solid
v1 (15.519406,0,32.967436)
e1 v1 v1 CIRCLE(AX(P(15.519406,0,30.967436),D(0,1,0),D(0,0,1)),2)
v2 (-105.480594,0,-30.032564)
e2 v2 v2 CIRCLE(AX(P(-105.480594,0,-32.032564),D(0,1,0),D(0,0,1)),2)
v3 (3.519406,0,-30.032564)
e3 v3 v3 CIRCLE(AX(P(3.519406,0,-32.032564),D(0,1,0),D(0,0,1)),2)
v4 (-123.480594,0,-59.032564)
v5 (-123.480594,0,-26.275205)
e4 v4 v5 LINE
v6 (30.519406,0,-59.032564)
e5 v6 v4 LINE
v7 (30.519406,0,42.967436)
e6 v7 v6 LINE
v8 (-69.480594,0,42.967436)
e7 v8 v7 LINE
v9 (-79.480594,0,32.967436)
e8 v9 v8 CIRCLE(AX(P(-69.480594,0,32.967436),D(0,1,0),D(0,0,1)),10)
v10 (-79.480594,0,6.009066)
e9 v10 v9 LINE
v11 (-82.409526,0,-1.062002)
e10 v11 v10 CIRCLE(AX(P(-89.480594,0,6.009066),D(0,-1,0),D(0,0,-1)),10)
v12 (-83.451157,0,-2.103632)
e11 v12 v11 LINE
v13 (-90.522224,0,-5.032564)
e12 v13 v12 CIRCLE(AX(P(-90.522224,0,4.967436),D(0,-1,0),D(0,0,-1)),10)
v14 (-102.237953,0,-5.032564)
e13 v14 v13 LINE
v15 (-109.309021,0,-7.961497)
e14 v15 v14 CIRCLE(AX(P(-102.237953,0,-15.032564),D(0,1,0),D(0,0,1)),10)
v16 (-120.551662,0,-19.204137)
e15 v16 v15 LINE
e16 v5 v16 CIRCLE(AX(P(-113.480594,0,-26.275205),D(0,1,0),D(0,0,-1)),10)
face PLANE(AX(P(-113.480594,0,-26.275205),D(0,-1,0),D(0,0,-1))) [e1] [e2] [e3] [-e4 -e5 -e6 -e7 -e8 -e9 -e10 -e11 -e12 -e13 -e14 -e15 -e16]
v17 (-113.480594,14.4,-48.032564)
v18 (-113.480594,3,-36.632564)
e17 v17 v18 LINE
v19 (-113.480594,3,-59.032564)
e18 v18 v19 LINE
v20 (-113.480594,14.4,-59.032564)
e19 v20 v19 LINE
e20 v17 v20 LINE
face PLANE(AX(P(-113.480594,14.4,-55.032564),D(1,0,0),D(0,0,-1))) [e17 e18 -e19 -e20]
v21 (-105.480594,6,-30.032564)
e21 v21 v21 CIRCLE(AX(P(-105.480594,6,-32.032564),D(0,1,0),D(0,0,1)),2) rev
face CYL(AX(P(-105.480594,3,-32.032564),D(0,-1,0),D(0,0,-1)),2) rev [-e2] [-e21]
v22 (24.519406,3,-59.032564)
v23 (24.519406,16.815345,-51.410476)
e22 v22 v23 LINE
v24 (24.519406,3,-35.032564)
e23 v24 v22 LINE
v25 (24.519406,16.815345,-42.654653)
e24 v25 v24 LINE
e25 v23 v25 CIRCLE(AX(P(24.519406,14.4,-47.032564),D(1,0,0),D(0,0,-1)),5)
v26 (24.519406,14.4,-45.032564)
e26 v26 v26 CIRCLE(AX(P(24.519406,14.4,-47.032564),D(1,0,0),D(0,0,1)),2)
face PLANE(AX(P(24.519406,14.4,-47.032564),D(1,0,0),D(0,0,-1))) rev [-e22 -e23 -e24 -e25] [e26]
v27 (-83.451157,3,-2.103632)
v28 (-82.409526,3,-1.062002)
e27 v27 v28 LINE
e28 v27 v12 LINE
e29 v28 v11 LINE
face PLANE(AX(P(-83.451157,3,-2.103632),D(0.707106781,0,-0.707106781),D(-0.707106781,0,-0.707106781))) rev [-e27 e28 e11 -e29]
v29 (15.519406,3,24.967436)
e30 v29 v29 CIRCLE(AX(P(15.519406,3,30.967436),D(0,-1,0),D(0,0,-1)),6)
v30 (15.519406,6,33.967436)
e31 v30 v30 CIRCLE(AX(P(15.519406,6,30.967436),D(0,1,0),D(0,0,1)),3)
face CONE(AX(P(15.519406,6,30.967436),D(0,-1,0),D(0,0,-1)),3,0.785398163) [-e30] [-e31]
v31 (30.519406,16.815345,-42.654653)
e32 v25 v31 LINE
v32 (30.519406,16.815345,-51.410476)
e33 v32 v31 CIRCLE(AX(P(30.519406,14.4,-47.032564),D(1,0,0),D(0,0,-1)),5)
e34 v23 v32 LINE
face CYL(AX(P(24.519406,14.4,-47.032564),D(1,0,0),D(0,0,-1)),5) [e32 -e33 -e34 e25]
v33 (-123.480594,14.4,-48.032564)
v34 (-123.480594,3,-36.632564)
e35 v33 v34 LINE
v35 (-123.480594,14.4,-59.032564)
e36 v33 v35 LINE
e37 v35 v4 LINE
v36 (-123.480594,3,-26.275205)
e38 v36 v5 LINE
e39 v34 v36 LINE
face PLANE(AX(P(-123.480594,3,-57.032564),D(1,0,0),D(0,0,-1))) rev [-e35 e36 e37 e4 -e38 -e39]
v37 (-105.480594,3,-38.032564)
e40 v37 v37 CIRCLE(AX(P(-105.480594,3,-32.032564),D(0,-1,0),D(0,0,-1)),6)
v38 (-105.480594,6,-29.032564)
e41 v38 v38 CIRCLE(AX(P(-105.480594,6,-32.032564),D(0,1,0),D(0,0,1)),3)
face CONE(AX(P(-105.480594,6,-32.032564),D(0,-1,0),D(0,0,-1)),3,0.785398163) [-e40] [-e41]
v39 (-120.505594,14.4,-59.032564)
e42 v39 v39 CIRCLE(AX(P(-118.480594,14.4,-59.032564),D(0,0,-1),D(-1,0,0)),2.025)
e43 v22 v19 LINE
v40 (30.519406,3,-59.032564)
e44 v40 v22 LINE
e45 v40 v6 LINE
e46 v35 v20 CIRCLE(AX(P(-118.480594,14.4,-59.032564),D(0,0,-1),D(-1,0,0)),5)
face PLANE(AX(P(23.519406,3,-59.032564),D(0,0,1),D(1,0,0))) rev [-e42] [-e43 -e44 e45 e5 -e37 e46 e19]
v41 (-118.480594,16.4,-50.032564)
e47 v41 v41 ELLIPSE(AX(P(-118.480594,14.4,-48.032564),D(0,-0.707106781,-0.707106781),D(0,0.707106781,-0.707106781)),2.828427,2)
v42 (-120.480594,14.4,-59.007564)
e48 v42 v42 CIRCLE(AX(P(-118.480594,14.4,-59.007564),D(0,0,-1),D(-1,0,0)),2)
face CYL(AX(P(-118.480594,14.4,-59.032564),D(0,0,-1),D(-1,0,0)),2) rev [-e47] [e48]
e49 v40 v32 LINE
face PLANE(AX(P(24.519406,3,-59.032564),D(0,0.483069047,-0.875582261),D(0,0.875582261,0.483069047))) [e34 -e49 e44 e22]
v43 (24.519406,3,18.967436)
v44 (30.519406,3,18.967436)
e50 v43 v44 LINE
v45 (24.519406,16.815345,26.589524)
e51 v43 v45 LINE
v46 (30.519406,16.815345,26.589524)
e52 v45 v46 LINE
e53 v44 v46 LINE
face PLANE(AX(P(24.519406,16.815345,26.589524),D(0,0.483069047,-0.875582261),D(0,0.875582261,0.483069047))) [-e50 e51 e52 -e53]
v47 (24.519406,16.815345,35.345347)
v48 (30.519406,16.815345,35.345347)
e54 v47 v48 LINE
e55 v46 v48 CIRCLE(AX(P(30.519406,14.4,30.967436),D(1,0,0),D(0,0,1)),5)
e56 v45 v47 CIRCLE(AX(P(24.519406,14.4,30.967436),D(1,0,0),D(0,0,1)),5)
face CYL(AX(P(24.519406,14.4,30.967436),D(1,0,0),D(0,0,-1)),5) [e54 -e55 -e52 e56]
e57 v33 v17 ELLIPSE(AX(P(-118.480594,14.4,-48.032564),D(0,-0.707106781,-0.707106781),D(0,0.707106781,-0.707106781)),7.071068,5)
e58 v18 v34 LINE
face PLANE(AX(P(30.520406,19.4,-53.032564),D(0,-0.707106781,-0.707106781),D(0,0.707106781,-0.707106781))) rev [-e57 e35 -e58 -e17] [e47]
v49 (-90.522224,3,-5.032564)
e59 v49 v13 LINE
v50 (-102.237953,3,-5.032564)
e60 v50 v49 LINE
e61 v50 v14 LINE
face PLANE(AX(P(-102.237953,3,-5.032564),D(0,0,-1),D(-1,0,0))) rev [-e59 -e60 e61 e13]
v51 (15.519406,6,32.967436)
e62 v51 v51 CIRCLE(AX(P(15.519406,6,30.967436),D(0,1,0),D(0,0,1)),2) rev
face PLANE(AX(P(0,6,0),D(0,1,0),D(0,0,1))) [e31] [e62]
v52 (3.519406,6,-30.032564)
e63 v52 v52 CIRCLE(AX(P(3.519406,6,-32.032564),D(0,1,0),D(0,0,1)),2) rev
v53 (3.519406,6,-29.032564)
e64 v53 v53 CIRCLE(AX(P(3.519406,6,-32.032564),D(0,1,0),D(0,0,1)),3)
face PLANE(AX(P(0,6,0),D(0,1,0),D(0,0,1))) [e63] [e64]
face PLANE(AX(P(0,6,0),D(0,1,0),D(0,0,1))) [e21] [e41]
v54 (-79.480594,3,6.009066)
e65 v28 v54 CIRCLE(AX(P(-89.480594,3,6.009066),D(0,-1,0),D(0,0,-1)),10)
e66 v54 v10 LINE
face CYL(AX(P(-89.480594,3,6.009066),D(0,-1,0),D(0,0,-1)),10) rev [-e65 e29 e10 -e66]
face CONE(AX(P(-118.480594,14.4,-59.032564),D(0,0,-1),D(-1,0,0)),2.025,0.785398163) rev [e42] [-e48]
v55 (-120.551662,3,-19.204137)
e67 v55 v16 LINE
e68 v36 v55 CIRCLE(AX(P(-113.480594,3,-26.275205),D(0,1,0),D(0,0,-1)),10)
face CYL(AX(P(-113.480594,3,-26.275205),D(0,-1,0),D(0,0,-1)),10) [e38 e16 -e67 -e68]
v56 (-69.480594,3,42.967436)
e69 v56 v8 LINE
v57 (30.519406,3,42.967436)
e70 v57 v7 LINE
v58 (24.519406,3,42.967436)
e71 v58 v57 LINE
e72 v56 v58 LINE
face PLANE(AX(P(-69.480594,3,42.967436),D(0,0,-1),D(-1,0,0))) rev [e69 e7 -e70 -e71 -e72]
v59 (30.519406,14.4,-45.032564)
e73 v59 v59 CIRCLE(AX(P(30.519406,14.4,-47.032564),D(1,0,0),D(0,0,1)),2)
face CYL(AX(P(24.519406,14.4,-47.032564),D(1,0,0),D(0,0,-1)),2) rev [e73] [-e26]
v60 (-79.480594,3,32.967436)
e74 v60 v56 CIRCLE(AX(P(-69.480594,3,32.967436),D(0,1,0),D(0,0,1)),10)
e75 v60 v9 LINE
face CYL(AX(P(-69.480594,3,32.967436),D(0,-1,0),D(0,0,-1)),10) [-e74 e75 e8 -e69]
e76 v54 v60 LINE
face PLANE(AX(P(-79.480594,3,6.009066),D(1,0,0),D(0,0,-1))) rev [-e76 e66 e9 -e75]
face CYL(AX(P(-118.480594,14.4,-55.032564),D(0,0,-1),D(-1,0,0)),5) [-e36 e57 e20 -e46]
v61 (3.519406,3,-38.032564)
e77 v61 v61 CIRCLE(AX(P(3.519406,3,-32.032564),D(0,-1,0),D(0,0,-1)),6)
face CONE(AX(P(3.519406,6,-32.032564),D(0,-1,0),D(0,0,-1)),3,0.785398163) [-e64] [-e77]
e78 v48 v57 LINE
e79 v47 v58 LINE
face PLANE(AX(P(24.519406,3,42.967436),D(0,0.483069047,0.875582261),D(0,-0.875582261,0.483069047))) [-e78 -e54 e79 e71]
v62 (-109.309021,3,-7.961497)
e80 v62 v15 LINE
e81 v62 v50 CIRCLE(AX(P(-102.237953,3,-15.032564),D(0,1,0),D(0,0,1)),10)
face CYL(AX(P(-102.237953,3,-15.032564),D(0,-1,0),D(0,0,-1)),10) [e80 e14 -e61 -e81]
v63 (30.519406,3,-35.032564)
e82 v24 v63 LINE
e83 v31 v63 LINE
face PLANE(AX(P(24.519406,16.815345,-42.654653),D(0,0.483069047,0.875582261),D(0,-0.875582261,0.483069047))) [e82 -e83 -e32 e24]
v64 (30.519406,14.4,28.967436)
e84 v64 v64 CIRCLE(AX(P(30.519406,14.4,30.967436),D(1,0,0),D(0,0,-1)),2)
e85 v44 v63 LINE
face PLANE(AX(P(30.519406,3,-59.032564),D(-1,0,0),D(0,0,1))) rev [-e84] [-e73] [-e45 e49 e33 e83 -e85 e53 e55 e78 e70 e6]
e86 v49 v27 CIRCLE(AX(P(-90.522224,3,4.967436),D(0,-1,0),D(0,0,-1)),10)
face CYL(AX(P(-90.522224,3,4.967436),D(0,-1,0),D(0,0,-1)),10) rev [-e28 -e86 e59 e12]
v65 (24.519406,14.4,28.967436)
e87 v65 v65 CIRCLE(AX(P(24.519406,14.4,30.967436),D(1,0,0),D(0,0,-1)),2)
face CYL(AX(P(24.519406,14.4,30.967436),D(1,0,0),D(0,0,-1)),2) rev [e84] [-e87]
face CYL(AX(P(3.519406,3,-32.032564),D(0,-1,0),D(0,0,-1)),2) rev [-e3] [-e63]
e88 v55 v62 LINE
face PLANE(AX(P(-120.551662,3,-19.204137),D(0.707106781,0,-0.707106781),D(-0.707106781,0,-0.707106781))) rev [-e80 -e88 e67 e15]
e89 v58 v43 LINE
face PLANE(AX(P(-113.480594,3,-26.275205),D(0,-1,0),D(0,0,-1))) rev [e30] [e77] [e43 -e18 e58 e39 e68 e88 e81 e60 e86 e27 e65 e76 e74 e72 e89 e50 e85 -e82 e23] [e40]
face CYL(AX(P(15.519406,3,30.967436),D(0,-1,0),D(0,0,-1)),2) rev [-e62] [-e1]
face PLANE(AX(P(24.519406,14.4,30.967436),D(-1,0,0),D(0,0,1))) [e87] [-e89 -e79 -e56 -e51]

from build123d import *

# Parameters (mm, degrees)
SKETCH1_R                       = 2
BOSS_EXTRUDE1_DEPTH             = 3
SKETCH4_R                       = 3
SKETCH4_R_2                     = 2
BOSS_EXTRUDE2_DEPTH             = 3
CHAMFER1_SIZE                   = 3
BOSS_EXTRUDE3_DEPTH             = 4
BOSS_EXTRUDE4_DEPTH             = 20
CUT_EXTRUDE1_REACH              = 168.064
F_4_0MM_DOWEL_HOLE1_D           = 4
F_4_0MM_DOWEL_HOLE1_CSINK_D     = 4.05
F_4_0MM_DOWEL_HOLE1_CSINK_ANGLE = 90
SKETCH13_R                      = 2
BOSS_EXTRUDE5_DEPTH             = 6


with BuildPart() as part:
    # Sketch1 → Boss-Extrude1 (new body)
    with BuildSketch(Plane(origin=(0, 0, 0), x_dir=(1, 0, 0), z_dir=(0, 1, 0))):
        with BuildLine():
            ThreePointArc((-123.480593783, 26.275205138), (-122.719389108, 22.448370814), (-120.551661595, 19.204137326))
            Line((-120.551661595, 19.204137326), (-109.309020908, 7.961496639))
            ThreePointArc((-109.309020908, 7.961496639), (-106.064787419, 5.793769125), (-102.237953096, 5.032564451))
            Line((-102.237953096, 5.032564451), (-90.522224343, 5.032564451))
            ThreePointArc((-90.522224343, 5.032564451), (-86.69539002, 4.271359776), (-83.451156531, 2.103632262))
            Line((-83.451156531, 2.103632262), (-82.409525971, 1.062001702))
            ThreePointArc((-82.409525971, 1.062001702), (-80.241798458, -2.182231786), (-79.480593783, -6.00906611))
            Line((-79.480593783, -6.00906611), (-79.480593783, -32.967435549))
            ThreePointArc((-79.480593783, -32.967435549), (-76.551661595, -40.038503361), (-69.480593783, -42.967435549))
            Line((-69.480593783, -42.967435549), (30.519406217, -42.967435549))
            Line((30.519406217, -42.967435549), (30.519406217, 59.032564451))
            Line((30.519406217, 59.032564451), (-123.480593783, 59.032564451))
            Line((-123.480593783, 59.032564451), (-123.480593783, 26.275205138))
        make_face()
        with Locations((-105.480593783, 32.032564451)):
            Circle(SKETCH1_R, mode=Mode.SUBTRACT)
        with Locations((3.519406217, 32.032564451)):
            Circle(SKETCH1_R, mode=Mode.SUBTRACT)
        with Locations((15.519406217, -30.967435549)):
            Circle(SKETCH1_R, mode=Mode.SUBTRACT)
    extrude(amount=BOSS_EXTRUDE1_DEPTH)

    # Sketch4 → Boss-Extrude2 (add)
    # profile 1 of 3: a face of its own
    with BuildSketch(Plane(origin=(0, 3, 0), x_dir=(1, 0, 0), z_dir=(0, 1, 0))):
        with Locations(Location((-105.480593783, 32.032564451, 0), (0, 0, 90))):
            Circle(SKETCH4_R)
        with Locations(Location((-105.480593783, 32.032564451, 0), (0, 0, 270))):
            Circle(SKETCH4_R_2, mode=Mode.SUBTRACT)
    # profile 2 of 3: a face of its own
    with BuildSketch(Plane(origin=(0, 3, 0), x_dir=(1, 0, 0), z_dir=(0, 1, 0))):
        with Locations(Location((15.519406217, -30.967435549, 0), (0, 0, 90))):
            Circle(SKETCH4_R)
        with Locations(Location((15.519406217, -30.967435549, 0), (0, 0, 270))):
            Circle(SKETCH4_R_2, mode=Mode.SUBTRACT)
    # profile 3 of 3: a face of its own
    with BuildSketch(Plane(origin=(0, 3, 0), x_dir=(1, 0, 0), z_dir=(0, 1, 0))):
        with Locations(Location((3.519406217, 32.032564451, 0), (0, 0, 90))):
            Circle(SKETCH4_R)
        with Locations(Location((3.519406217, 32.032564451, 0), (0, 0, 270))):
            Circle(SKETCH4_R_2, mode=Mode.SUBTRACT)
    extrude(amount=BOSS_EXTRUDE2_DEPTH)

    # Chamfer1
    chamfer1_edges = [part.edges().sort_by_distance(p)[0] for p in [
        (-105.480593783, 3, -29.032564451),
        (15.519406217, 3, 33.967435549),
        (3.519406217, 3, -29.032564451),
    ]]
    chamfer(chamfer1_edges, length=CHAMFER1_SIZE - 0.0001)  # a hair under: the kernel refuses the full size

    # Sketch7 → Boss-Extrude3 (add)
    with BuildSketch(Plane(origin=(0, 0, -59.032564451), x_dir=(-1, 0, 0), z_dir=(0, 0, -1))):
        with BuildLine():
            Line((113.480593783, 14.4), (113.480593783, 3))
            Line((113.480593783, 3), (123.480593783, 3))
            Line((123.480593783, 3), (123.480593783, 14.4))
            ThreePointArc((123.480593783, 14.4), (118.480593783, 19.4), (113.480593783, 14.4))
        make_face()
    extrude(amount=-BOSS_EXTRUDE3_DEPTH)

    # Sketch9 → Boss-Extrude4 (add)
    with BuildSketch(Plane.XY.offset(-55.032564451)):
        with BuildLine():
            Line((-123.480593783, 3), (-113.480593783, 3))
            Line((-113.480593783, 3), (-113.480593783, 14.4))
            ThreePointArc((-113.480593783, 14.4), (-118.480593783, 19.4), (-123.480593783, 14.4))
            Line((-123.480593783, 14.4), (-123.480593783, 3))
        make_face()
    extrude(amount=BOSS_EXTRUDE4_DEPTH)

    # Sketch10 → Cut-Extrude1 (cut, up to next)
    with BuildSketch(Plane.ZY.offset(123.480593783), mode=Mode.PRIVATE) as cut_extrude1_sk1:
        Polygon((-53.032564451, 19.4), (-36.632564451, 3), (-35.032564451, 3), (-35.032564451, 19.4), align=None)
    cut_extrude1_tool1 = extrude(cut_extrude1_sk1.sketch, amount=-CUT_EXTRUDE1_REACH, mode=Mode.PRIVATE) & part.part
    add(cut_extrude1_tool1.solids().sort_by_distance((-123.480594, 13.487075, -41.076102))[0], mode=Mode.SUBTRACT)

    # Ø4.0mm Dowel Hole1 (through all)
    with Locations(Plane(origin=(0, 0, -59.032564451), x_dir=(-1, 0, 0), z_dir=(0, 0, -1))):
        with Locations((118.480593783, 14.4)):
            CounterSinkHole(F_4_0MM_DOWEL_HOLE1_D / 2, F_4_0MM_DOWEL_HOLE1_CSINK_D / 2, counter_sink_angle=F_4_0MM_DOWEL_HOLE1_CSINK_ANGLE)

    # Sketch13 → Boss-Extrude5 (add)
    # profile 1 of 2: a face of its own
    with BuildSketch(Plane(origin=(30.519406217, 0, 0), x_dir=(0, 0, -1), z_dir=(1, 0, 0))):
        with BuildLine():
            Line((-26.589524244, 16.815345234), (-18.967435549, 3))
            Line((-18.967435549, 3), (-42.967435549, 3))
            Line((-42.967435549, 3), (-35.345346855, 16.815345234))
            ThreePointArc((-35.345346855, 16.815345234), (-30.967435549, 19.4), (-26.589524244, 16.815345234))
        make_face()
        with Locations((-30.967435549, 14.4)):
            Circle(SKETCH13_R, mode=Mode.SUBTRACT)
    # profile 2 of 2: a face of its own
    with BuildSketch(Plane(origin=(30.519406217, 0, 0), x_dir=(0, 0, -1), z_dir=(1, 0, 0))):
        with BuildLine():
            Line((59.032564451, 3), (51.410475756, 16.815345234))
            ThreePointArc((51.410475756, 16.815345234), (47.032564451, 19.4), (42.654653145, 16.815345234))
            Line((42.654653145, 16.815345234), (35.032564451, 3))
            Line((35.032564451, 3), (59.032564451, 3))
        make_face()
        with Locations(Location((47.032564451, 14.4, 0), (0, 0, 180))):
            Circle(SKETCH13_R, mode=Mode.SUBTRACT)
    extrude(amount=-BOSS_EXTRUDE5_DEPTH)


solid = part.part
